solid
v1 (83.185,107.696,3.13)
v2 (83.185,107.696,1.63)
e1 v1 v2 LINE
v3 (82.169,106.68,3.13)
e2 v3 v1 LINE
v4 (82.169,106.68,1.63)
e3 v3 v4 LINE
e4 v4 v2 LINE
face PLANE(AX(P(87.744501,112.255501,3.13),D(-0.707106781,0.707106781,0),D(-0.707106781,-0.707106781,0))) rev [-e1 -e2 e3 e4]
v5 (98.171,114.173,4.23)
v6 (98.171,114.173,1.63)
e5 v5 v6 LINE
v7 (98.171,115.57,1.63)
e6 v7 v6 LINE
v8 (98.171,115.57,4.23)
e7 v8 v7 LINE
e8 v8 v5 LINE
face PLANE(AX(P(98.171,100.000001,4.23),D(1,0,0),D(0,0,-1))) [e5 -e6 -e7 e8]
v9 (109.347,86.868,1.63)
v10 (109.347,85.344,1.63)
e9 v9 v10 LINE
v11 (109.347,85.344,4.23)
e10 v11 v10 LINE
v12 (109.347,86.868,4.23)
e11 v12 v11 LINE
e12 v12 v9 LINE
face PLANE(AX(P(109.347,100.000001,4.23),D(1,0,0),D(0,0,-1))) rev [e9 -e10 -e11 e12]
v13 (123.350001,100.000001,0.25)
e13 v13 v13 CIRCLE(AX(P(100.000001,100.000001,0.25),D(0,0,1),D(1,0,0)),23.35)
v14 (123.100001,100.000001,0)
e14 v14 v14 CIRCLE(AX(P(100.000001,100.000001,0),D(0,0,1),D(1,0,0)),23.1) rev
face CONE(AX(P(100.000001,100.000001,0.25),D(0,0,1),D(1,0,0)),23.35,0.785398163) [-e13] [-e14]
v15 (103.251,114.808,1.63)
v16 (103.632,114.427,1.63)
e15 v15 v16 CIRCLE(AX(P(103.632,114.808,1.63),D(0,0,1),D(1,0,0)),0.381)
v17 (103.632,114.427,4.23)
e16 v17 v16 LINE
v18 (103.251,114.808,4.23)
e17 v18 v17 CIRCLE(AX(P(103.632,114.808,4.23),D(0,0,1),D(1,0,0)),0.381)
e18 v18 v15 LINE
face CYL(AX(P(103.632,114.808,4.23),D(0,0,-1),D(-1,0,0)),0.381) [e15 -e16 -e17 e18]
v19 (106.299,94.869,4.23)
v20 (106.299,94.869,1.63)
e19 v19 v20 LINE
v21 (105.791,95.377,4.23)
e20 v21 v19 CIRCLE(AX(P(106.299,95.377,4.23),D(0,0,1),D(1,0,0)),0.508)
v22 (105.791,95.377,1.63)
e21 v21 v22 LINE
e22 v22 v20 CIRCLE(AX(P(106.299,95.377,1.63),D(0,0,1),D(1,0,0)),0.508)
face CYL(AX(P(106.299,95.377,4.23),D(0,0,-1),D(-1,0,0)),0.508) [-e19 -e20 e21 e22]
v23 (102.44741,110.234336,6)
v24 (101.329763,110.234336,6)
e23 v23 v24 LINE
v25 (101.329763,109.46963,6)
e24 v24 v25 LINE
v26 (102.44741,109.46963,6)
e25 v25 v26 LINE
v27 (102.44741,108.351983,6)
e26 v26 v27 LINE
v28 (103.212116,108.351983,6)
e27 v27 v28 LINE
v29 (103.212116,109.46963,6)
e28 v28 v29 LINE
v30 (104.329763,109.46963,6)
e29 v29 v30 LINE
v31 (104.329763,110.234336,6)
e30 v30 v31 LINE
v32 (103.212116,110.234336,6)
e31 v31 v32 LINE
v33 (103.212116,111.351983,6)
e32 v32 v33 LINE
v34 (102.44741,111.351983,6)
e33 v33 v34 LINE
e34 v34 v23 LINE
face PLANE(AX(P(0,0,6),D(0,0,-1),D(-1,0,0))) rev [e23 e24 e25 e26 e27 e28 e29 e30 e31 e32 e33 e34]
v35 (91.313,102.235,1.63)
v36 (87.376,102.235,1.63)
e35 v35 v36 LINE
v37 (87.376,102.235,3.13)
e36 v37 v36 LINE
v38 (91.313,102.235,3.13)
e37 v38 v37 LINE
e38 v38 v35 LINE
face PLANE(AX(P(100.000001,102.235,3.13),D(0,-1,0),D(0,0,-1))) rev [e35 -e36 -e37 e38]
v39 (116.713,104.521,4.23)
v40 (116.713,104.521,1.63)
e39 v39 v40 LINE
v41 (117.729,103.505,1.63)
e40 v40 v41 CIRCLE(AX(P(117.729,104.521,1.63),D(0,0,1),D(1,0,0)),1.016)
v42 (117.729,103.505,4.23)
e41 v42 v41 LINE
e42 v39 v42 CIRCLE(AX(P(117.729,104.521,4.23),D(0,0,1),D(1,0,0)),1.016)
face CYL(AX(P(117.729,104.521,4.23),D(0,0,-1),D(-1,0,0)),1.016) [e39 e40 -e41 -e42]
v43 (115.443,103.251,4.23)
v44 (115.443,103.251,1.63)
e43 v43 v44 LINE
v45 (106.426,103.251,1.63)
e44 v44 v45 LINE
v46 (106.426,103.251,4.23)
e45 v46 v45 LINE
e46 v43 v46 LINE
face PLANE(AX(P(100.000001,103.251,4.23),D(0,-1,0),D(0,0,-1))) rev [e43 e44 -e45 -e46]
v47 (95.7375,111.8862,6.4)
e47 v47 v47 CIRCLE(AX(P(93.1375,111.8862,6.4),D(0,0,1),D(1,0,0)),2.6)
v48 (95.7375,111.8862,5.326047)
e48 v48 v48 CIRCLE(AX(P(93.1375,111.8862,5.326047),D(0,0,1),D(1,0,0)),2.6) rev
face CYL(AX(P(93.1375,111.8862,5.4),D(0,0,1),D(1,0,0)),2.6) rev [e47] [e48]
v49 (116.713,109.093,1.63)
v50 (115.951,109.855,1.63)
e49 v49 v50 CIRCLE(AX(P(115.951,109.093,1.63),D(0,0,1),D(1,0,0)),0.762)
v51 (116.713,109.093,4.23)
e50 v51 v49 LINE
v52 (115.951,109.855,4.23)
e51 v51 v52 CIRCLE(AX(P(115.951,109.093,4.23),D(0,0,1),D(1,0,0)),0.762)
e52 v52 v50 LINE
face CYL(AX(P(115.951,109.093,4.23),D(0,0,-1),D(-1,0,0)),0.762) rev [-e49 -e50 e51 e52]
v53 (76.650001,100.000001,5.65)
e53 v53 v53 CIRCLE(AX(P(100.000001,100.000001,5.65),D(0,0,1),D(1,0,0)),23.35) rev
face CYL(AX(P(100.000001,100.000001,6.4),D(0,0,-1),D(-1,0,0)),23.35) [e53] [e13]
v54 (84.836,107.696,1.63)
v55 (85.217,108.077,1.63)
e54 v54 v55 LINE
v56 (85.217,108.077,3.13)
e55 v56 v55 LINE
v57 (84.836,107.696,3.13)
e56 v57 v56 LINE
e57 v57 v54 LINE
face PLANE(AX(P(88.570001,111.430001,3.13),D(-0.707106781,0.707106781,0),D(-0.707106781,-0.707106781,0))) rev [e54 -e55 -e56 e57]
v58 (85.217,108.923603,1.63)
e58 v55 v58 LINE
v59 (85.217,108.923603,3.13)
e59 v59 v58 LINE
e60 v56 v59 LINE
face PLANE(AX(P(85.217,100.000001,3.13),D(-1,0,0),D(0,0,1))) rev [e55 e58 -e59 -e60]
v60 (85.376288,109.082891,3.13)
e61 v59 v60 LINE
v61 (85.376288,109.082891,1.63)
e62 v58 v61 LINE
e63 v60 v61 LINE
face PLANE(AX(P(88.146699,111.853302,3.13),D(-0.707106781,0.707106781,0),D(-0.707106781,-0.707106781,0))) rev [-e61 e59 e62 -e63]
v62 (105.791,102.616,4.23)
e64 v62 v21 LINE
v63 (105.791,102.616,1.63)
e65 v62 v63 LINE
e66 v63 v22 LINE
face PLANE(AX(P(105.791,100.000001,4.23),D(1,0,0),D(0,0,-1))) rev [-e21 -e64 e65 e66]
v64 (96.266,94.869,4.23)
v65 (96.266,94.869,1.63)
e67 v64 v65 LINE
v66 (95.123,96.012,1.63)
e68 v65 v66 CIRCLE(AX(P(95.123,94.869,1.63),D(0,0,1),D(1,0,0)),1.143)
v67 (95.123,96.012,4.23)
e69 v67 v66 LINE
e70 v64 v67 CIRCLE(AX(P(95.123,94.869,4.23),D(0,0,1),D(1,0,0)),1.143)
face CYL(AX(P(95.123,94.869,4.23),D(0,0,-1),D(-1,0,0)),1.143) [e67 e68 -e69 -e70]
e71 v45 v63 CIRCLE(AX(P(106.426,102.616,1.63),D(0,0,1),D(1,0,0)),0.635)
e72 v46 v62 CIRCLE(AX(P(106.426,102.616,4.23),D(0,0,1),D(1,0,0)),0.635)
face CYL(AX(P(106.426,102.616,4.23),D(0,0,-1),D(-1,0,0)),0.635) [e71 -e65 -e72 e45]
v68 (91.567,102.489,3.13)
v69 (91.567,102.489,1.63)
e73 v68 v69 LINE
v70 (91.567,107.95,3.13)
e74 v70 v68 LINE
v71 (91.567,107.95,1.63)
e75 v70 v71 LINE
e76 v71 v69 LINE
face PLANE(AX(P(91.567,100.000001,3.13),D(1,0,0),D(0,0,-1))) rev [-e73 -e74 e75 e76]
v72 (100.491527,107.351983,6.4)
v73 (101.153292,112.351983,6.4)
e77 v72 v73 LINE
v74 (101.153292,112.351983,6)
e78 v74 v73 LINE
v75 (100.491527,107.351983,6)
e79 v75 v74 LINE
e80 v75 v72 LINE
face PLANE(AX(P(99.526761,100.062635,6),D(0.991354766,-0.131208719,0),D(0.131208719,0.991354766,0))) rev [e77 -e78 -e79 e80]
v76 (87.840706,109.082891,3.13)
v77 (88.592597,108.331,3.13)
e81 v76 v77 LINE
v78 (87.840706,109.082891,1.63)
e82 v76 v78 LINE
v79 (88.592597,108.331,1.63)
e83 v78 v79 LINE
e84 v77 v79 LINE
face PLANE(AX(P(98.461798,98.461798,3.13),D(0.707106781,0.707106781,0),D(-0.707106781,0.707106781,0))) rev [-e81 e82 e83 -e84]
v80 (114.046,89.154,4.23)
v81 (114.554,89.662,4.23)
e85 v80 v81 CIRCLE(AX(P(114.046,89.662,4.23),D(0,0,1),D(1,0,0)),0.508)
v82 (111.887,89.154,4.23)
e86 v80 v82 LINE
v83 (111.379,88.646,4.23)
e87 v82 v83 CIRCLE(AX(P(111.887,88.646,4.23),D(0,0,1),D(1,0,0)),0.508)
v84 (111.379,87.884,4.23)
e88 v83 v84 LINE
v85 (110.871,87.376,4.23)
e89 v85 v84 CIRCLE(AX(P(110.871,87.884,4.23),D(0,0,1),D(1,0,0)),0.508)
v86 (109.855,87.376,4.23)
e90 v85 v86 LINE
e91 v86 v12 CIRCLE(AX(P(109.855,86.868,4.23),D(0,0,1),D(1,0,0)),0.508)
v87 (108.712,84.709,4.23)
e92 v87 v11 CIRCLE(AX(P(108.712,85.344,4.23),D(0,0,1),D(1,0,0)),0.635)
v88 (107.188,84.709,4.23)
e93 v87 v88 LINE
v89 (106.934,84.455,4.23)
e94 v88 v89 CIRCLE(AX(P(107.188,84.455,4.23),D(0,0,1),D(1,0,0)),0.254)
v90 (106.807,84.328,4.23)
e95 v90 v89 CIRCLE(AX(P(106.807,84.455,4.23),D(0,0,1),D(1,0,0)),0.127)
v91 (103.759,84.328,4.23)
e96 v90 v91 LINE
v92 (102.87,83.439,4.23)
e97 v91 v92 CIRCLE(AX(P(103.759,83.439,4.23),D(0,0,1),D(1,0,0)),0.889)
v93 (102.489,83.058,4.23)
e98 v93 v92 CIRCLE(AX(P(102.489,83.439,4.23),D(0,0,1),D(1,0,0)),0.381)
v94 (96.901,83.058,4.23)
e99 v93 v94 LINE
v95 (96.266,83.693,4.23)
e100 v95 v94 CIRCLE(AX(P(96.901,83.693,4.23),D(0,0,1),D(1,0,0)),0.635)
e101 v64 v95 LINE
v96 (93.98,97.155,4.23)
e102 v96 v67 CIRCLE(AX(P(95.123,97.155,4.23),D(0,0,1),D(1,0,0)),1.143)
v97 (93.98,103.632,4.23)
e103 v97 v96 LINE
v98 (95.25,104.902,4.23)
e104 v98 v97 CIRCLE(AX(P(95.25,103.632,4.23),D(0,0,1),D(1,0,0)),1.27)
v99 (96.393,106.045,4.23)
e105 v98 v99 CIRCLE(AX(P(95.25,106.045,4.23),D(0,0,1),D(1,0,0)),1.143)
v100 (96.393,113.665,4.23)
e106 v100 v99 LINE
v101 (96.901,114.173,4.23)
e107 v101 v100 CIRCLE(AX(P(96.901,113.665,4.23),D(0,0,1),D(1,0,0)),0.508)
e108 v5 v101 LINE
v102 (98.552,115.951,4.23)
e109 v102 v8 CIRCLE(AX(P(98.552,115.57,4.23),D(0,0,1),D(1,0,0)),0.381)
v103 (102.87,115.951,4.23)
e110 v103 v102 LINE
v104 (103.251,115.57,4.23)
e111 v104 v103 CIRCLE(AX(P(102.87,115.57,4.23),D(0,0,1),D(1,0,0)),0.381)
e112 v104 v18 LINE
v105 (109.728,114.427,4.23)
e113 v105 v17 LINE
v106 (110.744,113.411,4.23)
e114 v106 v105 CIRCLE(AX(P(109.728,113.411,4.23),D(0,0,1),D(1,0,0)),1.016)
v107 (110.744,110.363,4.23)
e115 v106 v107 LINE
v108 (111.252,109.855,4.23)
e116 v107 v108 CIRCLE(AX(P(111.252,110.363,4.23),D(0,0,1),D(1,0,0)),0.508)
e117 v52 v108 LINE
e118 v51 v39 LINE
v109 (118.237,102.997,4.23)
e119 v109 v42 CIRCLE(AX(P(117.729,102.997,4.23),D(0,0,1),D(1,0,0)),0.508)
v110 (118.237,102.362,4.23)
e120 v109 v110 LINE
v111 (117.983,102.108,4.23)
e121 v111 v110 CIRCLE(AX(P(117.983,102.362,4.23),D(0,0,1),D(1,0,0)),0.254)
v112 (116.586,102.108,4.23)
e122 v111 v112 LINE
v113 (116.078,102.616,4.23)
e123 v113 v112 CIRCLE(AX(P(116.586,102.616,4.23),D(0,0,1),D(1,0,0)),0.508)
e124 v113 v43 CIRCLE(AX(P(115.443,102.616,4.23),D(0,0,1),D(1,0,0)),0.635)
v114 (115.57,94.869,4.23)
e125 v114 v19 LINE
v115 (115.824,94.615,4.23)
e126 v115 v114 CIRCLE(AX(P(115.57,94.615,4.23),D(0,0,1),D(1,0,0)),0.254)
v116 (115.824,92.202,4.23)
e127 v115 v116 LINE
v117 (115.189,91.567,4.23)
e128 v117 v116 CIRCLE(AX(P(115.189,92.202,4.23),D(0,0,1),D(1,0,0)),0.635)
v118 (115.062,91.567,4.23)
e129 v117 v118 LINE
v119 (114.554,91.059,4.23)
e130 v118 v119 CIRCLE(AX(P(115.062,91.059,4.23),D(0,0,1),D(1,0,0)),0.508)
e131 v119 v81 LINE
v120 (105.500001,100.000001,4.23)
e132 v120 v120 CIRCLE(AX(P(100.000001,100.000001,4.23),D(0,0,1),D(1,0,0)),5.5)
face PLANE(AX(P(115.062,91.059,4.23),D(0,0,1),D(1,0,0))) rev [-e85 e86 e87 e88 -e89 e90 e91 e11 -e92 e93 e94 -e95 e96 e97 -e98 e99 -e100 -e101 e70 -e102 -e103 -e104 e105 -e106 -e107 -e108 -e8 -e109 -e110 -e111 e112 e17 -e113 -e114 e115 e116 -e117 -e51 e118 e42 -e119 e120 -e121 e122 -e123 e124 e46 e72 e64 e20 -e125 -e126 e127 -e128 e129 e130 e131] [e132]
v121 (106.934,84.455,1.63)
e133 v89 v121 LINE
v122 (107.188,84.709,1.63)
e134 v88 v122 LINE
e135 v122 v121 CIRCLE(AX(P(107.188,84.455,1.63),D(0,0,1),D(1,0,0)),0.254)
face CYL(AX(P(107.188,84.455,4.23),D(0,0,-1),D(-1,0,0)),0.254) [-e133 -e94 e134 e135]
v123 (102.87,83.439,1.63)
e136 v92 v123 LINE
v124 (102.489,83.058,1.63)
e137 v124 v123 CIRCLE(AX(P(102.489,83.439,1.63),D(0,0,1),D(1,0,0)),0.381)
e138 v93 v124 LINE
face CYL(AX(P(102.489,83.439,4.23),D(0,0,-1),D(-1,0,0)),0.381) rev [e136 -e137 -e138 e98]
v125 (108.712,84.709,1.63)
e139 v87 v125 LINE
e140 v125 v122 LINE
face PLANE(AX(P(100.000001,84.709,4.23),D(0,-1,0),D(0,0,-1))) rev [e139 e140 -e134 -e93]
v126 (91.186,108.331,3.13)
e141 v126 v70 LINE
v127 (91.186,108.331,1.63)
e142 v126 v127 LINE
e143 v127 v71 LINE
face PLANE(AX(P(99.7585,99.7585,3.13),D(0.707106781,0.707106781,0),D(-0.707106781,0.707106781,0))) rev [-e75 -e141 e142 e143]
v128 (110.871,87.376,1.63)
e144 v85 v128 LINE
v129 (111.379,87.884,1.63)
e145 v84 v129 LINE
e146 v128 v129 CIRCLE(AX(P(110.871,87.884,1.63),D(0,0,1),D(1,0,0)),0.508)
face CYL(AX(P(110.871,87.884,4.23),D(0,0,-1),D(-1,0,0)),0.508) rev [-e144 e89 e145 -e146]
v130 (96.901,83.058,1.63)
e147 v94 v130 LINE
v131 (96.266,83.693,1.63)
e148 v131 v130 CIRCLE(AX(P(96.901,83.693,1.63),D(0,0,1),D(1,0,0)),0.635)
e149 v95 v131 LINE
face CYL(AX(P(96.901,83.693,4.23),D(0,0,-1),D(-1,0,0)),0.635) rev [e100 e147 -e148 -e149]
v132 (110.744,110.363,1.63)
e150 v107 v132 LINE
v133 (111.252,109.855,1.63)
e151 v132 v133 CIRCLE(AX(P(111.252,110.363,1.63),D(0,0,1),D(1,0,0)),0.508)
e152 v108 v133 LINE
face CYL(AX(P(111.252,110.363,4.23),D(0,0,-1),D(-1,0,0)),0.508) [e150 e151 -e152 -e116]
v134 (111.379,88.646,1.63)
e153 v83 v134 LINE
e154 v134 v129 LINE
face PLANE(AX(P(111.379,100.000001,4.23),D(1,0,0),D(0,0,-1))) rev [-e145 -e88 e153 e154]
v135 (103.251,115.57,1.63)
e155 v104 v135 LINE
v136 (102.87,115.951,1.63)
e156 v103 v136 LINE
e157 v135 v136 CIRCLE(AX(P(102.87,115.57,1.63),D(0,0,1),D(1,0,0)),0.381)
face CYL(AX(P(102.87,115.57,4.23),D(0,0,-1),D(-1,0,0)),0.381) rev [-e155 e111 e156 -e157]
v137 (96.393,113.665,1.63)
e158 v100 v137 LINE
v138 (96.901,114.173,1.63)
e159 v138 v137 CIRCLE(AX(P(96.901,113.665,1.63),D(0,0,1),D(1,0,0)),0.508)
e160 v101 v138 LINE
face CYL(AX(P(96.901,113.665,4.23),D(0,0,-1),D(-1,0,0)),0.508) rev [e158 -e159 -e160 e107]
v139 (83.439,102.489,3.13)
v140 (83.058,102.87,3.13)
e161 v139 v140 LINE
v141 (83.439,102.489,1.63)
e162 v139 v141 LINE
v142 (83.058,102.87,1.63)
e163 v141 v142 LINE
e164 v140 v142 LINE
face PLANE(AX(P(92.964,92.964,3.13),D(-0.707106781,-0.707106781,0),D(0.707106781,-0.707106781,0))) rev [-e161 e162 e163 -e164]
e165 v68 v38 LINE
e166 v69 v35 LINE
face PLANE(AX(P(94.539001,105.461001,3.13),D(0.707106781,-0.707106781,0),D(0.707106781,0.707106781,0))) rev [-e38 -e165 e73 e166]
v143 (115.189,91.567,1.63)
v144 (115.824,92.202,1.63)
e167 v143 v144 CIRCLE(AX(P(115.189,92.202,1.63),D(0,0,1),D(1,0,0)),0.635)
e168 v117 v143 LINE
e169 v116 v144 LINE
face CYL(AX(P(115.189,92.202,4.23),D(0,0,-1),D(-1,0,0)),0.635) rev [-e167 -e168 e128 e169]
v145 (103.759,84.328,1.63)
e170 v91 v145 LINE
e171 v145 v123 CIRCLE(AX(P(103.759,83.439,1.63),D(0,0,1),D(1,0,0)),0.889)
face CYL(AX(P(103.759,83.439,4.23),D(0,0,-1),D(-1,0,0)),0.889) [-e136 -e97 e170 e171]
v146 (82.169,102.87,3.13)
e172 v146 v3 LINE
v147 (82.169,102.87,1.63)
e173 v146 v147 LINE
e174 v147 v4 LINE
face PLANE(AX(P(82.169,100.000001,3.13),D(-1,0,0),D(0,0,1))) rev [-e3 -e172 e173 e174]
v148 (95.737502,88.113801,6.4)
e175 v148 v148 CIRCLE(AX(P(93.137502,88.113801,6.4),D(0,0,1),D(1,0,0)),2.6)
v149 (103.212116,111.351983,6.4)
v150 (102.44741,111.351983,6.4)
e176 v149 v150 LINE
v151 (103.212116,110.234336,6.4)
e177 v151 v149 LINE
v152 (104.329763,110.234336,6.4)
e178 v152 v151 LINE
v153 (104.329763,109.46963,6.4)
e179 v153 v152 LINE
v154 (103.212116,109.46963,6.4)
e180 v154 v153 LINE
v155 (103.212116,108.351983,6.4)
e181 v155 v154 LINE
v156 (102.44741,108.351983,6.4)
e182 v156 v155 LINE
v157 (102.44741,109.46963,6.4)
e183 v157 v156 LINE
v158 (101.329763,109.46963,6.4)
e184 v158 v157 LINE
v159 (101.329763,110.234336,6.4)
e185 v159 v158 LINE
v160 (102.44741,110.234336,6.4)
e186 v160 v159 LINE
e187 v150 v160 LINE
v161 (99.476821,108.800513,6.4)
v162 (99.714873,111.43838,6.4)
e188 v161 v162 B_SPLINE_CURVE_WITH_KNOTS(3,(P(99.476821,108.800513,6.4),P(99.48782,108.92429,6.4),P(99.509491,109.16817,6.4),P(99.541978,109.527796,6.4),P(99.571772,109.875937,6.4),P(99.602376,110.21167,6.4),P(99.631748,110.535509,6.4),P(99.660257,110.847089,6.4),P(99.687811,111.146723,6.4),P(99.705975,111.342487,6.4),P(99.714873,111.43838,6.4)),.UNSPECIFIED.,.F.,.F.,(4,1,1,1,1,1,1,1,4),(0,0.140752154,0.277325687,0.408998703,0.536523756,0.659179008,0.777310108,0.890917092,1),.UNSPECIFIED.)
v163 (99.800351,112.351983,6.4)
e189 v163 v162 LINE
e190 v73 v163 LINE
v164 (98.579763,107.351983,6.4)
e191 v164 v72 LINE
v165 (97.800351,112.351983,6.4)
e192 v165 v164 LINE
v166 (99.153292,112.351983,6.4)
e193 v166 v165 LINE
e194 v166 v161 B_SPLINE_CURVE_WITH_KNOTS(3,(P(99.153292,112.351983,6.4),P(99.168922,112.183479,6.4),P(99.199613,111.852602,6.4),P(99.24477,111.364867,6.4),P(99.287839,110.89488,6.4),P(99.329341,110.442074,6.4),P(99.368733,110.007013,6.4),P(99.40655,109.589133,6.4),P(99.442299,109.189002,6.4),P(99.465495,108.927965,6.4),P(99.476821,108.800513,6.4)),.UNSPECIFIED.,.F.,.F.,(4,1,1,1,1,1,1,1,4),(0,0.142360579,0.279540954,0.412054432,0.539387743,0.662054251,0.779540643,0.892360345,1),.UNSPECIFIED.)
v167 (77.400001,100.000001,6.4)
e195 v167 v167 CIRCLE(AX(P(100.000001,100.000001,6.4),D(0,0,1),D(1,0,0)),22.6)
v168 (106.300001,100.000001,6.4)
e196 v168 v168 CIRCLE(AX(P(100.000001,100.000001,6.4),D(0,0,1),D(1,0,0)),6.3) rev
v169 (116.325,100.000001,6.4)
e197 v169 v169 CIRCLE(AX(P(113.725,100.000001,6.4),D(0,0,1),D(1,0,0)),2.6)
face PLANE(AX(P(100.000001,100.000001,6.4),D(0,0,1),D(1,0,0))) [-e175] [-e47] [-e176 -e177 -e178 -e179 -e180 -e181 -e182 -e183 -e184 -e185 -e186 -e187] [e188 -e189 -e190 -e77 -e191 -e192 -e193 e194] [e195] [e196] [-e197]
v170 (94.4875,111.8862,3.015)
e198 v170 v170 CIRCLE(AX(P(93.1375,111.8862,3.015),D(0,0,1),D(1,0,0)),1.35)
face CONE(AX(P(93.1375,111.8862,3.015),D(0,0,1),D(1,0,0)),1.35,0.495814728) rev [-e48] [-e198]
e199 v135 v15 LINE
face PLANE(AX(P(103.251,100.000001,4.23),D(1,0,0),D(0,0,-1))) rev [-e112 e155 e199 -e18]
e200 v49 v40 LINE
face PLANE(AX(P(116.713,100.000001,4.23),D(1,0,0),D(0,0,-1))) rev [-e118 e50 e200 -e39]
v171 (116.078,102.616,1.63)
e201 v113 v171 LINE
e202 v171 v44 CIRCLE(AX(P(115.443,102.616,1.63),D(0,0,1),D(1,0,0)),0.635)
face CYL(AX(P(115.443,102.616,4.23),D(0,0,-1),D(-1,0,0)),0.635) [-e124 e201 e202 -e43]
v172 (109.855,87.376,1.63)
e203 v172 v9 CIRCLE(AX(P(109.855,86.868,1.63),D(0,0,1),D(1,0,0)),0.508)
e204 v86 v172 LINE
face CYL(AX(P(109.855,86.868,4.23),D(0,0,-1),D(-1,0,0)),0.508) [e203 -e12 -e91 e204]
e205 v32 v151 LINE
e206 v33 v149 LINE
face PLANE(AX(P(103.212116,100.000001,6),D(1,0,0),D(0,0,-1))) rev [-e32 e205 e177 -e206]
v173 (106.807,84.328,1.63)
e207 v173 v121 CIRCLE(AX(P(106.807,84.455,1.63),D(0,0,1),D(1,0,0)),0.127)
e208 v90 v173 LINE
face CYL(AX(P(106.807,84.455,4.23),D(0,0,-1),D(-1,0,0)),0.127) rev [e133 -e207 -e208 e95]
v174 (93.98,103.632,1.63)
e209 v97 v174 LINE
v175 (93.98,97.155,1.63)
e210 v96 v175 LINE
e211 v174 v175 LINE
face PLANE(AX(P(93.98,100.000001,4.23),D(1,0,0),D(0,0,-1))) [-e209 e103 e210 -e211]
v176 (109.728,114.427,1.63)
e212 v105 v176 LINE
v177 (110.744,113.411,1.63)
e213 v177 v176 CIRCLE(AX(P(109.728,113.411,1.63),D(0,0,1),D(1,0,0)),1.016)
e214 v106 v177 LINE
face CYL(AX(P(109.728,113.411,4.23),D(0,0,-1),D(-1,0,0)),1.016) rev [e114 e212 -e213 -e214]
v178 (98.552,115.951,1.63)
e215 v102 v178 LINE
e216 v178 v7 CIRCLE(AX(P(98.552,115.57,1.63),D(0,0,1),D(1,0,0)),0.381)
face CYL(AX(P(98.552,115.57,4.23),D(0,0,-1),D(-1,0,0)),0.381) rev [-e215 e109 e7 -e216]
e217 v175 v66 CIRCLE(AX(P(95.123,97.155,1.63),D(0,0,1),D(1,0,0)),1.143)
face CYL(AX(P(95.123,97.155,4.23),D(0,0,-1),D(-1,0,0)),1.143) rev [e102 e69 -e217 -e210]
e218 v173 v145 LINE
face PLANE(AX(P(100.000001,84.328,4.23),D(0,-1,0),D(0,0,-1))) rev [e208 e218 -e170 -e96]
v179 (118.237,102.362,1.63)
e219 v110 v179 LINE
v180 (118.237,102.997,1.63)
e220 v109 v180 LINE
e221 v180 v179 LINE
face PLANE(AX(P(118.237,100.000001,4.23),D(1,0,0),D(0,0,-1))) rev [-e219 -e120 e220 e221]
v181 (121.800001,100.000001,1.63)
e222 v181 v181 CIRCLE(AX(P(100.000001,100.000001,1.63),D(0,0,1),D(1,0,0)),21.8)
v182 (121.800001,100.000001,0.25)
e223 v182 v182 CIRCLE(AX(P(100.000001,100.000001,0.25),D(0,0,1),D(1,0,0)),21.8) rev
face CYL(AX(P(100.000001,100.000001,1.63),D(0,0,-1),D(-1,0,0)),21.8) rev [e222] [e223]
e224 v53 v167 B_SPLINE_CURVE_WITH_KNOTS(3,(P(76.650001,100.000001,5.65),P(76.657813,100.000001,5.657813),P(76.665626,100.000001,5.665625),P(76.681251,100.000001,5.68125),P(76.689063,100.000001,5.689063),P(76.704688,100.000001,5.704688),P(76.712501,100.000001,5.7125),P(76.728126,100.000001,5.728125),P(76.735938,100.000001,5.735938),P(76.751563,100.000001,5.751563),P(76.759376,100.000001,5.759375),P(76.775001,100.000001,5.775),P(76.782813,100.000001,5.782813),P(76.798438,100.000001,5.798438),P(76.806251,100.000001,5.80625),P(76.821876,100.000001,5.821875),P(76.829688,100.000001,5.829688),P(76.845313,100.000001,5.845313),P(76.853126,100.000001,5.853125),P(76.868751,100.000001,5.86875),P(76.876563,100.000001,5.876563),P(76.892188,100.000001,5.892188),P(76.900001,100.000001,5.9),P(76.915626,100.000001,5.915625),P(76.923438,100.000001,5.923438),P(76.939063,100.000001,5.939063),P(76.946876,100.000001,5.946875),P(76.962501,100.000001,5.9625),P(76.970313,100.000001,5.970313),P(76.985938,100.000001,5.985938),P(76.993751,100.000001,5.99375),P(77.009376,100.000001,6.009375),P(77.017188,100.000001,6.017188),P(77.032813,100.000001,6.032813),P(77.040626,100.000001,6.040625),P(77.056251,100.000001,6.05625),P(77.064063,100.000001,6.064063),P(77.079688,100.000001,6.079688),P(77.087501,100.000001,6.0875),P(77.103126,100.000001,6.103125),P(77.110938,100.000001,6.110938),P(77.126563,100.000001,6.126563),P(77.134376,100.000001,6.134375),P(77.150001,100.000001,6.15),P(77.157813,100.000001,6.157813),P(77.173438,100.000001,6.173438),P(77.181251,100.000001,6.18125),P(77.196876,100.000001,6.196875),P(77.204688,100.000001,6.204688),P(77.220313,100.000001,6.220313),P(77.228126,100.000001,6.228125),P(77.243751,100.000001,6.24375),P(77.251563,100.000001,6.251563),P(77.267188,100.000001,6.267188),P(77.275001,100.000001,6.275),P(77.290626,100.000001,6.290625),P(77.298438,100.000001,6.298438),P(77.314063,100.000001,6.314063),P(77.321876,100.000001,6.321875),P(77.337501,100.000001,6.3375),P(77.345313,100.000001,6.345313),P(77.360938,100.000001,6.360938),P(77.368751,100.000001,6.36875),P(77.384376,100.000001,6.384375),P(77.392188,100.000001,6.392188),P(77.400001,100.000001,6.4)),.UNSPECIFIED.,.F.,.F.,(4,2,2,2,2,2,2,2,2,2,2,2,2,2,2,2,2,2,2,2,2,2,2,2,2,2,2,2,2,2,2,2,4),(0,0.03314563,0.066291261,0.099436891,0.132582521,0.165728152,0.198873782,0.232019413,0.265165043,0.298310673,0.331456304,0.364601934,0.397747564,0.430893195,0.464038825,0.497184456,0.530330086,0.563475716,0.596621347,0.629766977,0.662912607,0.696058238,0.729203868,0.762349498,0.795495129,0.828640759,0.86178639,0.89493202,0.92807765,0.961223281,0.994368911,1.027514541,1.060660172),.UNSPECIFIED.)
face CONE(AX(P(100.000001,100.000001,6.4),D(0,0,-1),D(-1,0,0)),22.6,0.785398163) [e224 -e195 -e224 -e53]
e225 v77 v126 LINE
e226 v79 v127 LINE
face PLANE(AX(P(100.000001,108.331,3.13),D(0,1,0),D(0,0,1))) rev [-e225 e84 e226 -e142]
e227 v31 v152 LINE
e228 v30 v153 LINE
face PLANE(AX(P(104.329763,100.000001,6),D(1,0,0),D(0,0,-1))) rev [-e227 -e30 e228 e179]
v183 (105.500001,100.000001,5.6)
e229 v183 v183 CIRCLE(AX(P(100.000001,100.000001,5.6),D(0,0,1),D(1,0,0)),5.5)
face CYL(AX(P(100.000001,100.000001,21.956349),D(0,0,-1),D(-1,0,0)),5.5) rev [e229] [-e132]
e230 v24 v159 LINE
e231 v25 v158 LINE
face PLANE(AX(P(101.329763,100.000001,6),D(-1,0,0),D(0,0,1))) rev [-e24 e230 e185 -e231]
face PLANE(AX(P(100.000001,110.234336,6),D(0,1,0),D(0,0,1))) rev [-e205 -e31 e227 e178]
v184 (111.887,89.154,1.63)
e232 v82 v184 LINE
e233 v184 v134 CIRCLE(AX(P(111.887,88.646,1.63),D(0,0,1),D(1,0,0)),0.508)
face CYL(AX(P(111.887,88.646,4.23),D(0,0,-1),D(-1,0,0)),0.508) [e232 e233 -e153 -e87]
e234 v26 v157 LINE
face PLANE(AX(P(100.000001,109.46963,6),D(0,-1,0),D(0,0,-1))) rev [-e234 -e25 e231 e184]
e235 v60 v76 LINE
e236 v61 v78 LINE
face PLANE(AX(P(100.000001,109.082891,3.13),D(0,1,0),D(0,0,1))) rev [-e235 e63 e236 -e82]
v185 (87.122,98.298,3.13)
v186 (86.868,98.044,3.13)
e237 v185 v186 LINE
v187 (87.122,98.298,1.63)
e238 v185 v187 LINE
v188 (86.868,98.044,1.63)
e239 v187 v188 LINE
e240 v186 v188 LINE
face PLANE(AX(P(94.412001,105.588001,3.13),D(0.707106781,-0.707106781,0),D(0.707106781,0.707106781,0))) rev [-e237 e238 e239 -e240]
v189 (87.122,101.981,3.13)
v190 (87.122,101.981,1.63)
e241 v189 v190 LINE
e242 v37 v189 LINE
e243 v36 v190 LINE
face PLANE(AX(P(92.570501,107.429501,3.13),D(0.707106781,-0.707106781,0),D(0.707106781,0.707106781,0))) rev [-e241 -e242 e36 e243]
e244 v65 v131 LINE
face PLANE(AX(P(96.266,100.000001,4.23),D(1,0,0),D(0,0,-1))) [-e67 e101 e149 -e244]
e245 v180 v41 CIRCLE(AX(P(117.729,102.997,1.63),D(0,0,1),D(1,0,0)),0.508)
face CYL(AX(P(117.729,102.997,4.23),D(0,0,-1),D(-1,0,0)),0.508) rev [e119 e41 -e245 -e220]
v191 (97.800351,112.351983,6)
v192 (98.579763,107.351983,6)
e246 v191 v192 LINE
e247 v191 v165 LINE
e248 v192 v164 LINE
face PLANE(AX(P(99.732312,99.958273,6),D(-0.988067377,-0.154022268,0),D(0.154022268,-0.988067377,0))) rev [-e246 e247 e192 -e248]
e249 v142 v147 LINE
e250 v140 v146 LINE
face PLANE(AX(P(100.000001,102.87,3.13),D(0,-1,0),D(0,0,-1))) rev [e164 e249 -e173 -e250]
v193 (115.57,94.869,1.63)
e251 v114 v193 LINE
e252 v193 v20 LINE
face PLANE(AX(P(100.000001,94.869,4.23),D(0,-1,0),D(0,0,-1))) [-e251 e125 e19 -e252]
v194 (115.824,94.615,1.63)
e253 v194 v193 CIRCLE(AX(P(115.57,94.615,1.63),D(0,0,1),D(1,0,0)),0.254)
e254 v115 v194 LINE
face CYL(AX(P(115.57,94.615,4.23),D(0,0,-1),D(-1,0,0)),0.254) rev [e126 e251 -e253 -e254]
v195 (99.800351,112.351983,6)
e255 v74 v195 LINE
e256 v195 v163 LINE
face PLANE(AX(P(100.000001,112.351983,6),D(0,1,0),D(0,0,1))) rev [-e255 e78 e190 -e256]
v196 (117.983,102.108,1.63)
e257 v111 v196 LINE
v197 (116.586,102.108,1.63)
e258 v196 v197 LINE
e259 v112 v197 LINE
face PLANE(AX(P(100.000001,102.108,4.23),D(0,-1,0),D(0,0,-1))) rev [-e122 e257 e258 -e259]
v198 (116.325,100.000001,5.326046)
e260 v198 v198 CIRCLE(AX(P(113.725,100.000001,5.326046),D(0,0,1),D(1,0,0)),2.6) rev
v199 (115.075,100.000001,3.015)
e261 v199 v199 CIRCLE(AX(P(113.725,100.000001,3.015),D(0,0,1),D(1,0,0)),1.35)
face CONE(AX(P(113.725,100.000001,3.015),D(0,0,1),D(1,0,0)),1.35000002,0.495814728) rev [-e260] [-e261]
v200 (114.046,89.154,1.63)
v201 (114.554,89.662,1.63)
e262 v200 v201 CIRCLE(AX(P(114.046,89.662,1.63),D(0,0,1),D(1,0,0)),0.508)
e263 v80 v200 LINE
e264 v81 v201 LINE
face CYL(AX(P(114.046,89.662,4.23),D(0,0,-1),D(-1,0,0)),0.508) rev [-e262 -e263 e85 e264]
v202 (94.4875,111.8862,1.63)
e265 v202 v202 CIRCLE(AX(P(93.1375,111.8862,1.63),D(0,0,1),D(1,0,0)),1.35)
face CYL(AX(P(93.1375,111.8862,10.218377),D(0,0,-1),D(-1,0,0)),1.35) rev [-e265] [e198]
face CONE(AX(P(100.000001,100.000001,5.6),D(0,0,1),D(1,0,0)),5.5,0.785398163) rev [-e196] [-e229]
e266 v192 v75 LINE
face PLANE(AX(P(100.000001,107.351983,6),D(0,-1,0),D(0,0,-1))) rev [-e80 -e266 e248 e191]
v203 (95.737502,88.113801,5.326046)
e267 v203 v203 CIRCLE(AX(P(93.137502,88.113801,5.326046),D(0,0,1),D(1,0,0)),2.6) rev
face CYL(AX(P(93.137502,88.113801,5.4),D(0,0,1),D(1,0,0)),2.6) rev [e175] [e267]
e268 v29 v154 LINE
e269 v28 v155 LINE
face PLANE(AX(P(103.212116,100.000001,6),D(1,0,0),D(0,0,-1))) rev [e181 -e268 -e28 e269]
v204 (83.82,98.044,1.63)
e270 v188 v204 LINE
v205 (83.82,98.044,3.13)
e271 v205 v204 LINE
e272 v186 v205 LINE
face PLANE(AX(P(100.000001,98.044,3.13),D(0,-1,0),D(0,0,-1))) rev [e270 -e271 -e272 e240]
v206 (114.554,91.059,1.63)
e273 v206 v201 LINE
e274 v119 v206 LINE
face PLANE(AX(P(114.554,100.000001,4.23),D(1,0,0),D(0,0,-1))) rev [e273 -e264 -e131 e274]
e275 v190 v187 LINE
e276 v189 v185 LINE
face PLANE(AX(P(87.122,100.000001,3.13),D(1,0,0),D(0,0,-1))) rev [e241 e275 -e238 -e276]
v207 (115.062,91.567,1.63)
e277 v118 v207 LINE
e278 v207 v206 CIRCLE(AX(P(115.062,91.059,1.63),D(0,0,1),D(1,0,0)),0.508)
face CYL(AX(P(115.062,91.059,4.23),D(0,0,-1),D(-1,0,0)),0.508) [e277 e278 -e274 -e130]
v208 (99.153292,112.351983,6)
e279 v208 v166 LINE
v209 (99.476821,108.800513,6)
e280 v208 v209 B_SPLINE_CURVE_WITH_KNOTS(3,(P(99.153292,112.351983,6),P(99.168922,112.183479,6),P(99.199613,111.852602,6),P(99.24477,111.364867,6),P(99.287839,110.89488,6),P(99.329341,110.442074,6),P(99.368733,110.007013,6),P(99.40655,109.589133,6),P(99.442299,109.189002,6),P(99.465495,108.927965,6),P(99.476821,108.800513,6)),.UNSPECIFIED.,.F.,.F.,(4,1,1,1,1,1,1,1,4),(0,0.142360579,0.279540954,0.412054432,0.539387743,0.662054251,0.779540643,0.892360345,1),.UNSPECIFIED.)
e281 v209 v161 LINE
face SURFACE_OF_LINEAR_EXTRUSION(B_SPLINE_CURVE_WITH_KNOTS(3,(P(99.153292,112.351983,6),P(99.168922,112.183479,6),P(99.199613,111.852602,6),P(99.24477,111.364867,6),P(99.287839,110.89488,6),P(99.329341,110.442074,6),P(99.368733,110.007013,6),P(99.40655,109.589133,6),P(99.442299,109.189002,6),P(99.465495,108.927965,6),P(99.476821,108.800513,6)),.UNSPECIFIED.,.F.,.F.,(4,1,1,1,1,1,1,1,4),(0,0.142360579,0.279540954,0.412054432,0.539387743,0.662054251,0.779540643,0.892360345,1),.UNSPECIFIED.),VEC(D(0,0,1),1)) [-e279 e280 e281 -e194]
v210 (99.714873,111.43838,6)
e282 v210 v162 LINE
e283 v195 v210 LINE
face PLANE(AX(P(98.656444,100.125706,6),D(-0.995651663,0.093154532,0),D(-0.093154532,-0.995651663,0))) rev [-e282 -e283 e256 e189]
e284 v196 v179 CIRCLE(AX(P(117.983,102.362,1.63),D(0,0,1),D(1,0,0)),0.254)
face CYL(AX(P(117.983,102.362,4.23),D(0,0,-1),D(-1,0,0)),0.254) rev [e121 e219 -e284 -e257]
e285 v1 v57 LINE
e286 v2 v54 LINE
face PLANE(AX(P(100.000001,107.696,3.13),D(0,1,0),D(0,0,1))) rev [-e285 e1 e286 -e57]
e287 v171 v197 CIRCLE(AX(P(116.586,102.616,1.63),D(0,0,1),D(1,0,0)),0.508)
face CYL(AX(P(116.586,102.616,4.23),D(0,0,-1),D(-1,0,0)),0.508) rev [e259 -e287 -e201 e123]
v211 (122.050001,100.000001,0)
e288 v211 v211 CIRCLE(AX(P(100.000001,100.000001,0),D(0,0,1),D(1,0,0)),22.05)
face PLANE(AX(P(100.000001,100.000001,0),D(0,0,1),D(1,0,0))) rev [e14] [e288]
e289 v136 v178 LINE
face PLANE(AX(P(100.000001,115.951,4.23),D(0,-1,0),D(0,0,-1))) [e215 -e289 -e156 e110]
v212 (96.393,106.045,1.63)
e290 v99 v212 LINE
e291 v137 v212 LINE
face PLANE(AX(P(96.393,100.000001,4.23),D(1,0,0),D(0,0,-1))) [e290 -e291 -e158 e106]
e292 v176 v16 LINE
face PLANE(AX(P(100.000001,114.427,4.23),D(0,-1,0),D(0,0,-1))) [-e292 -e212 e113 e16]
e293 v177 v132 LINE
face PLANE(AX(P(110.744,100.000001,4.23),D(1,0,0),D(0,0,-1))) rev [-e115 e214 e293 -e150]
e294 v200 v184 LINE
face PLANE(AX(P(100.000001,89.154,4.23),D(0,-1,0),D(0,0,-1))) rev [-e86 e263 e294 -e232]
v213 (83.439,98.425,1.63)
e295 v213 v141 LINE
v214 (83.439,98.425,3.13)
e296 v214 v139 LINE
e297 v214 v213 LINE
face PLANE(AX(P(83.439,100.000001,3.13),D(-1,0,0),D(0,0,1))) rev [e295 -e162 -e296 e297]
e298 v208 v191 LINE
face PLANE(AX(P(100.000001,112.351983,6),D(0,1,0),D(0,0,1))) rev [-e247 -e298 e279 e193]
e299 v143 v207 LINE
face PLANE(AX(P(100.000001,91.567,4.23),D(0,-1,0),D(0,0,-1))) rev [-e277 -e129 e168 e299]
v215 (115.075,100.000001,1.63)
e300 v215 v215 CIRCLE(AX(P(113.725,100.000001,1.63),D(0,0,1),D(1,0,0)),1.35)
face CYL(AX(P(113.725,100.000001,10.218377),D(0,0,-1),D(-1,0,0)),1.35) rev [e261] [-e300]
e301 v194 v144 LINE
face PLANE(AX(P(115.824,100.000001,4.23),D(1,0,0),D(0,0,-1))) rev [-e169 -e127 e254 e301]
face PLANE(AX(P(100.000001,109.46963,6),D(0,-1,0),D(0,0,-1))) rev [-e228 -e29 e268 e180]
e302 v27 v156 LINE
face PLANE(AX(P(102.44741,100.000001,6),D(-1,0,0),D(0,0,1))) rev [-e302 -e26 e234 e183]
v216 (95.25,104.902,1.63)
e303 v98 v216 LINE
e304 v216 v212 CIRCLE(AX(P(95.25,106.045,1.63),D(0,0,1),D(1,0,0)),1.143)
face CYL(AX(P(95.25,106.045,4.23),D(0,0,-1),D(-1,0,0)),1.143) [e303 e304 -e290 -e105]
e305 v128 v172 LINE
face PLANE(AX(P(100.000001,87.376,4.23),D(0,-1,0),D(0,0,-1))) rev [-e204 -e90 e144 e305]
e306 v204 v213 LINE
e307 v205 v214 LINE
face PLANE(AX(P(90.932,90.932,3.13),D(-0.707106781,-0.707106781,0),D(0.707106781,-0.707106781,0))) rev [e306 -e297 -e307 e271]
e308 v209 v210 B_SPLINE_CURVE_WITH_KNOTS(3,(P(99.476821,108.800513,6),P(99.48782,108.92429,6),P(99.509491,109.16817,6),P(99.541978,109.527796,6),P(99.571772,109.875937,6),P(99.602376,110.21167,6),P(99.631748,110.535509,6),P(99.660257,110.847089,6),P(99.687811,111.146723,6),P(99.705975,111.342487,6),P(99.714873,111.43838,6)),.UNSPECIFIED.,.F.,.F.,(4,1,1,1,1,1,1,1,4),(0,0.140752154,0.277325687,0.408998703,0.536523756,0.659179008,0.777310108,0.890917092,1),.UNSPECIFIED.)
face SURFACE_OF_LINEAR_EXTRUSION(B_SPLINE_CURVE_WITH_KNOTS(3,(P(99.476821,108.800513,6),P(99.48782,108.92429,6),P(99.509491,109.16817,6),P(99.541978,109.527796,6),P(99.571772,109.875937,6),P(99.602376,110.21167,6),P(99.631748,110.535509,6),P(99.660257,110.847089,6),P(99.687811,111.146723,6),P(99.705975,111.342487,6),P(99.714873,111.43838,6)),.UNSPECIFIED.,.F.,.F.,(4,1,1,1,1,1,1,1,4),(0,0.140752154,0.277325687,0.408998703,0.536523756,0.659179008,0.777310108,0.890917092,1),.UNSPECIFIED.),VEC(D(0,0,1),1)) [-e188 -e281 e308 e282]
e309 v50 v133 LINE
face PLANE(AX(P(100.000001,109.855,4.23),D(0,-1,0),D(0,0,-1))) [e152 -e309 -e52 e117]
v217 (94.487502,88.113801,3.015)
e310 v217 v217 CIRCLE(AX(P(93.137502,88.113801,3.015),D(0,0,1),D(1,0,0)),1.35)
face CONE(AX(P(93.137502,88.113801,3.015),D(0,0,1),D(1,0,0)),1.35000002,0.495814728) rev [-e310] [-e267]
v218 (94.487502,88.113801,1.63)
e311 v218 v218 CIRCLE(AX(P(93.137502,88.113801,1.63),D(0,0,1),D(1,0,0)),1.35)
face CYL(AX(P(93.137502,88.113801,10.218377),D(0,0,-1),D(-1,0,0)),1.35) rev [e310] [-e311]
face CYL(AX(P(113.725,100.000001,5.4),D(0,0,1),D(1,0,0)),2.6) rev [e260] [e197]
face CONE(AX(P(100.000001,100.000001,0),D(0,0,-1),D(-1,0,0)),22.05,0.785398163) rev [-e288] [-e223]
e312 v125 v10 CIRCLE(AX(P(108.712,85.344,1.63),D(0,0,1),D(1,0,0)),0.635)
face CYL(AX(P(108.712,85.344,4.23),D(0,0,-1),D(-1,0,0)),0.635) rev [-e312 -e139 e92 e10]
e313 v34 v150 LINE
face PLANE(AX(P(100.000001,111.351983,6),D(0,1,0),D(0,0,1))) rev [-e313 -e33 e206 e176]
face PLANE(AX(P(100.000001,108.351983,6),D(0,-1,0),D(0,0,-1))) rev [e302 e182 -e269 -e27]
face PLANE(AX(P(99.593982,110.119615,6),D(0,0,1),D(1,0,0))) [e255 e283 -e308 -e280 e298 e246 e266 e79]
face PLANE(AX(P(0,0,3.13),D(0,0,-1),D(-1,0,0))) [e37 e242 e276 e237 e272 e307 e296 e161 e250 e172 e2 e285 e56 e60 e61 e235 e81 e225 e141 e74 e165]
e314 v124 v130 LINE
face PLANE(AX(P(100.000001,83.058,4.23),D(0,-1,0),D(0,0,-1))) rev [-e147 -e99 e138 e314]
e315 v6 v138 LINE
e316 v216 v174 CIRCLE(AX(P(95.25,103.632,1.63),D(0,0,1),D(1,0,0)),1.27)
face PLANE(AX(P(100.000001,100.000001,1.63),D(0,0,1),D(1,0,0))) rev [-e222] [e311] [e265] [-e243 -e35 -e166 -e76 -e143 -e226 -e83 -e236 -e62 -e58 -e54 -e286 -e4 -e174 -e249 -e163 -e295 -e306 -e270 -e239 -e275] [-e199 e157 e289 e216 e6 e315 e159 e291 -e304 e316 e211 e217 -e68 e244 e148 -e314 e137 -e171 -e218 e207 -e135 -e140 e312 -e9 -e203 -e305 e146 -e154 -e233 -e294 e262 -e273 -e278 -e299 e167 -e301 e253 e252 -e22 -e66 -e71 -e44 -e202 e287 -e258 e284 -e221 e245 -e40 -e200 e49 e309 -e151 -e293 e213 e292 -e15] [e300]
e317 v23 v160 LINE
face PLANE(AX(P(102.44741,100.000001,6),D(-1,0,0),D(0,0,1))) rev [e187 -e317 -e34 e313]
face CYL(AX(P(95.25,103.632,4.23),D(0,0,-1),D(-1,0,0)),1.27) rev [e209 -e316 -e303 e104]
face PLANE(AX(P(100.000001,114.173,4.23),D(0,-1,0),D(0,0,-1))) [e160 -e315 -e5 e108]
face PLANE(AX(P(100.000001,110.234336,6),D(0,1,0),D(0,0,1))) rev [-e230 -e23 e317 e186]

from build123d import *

# Parameters (mm, degrees)
SKETCH_3_R          = 23.35
EXTRUDE_3_DEPTH     = 6.4
SKETCH_2_R          = 21.8
CUT_EXTRUDE_1_DEPTH = 1.63
CUT_EXTRUDE_START   = 1.63
CUT_EXTRUDE_2_DEPTH = 2.6
SKETCH_5_R          = 1.35000002
SKETCH_5_R_2        = 1.35
CUT_EXTRUDE_3_DEPTH = 4.77
CUT_EXTRUDE_START_2 = 4.23
SKETCH_5_3_R        = 5.5
CUT_EXTRUDE_4_DEPTH = 2.17
CHAMFER_1_SIZE      = 0.75
CUT_EXTRUDE_START_3 = 6.4
SKETCH_6_R          = 2.6
CUT_EXTRUDE_5_DEPTH = 1
CHAMFER_2_SIZE      = 1.29
CHAMFER_2_SIZE_2    = 2.385
CHAMFER_3_SIZE      = 0.25
CHAMFER_4_SIZE      = 0.8
CUT_EXTRUDE_7_DEPTH = 0.4
CUT_EXTRUDE_8_DEPTH = 1.5


with BuildPart() as part:
    # 草图3 → 凸台-拉伸3 (new body)
    with BuildSketch(Plane.XY):
        with Locations((100.00000066, 100.00000066)):
            Circle(SKETCH_3_R)
    extrude(amount=EXTRUDE_3_DEPTH)

    # 草图2 → 切除-拉伸1 (cut)
    with BuildSketch(Plane.XY):
        with Locations((100.00000066, 100.00000066)):
            Circle(SKETCH_2_R)
    extrude(amount=CUT_EXTRUDE_1_DEPTH, mode=Mode.SUBTRACT)

    # 草图4 → 切除-拉伸2 (cut)
    with BuildSketch(Plane.XY.offset(CUT_EXTRUDE_START)):
        with BuildLine():
            Line((98.171, 114.173), (98.171, 115.57))
            ThreePointArc((98.171, 115.57), (98.282592316, 115.839407684), (98.552, 115.951))
            Line((98.552, 115.951), (102.87, 115.951))
            ThreePointArc((102.87, 115.951), (103.139407684, 115.839407684), (103.251, 115.57))
            Line((103.251, 115.57), (103.251, 114.808))
            ThreePointArc((103.251, 114.808), (103.362592316, 114.538592316), (103.632, 114.427))
            Line((103.632, 114.427), (109.728, 114.427))
            ThreePointArc((109.728, 114.427), (110.44642049, 114.12942049), (110.744, 113.411))
            Line((110.744, 113.411), (110.744, 110.363))
            ThreePointArc((110.744, 110.363), (110.892789755, 110.003789755), (111.252, 109.855))
            Line((111.252, 109.855), (115.951, 109.855))
            ThreePointArc((115.951, 109.855), (116.489815367, 109.631815367), (116.713, 109.093))
            Line((116.713, 109.093), (116.713, 104.521))
            ThreePointArc((116.713, 104.521), (117.01057951, 103.80257951), (117.729, 103.505))
            ThreePointArc((117.729, 103.505), (118.088210245, 103.356210245), (118.237, 102.997))
            Line((118.237, 102.997), (118.237, 102.362))
            ThreePointArc((118.237, 102.362), (118.162605122, 102.182394878), (117.983, 102.108))
            Line((117.983, 102.108), (116.586, 102.108))
            ThreePointArc((116.586, 102.108), (116.226789755, 102.256789755), (116.078, 102.616))
            ThreePointArc((116.078, 102.616), (115.892012806, 103.065012806), (115.443, 103.251))
            Line((115.443, 103.251), (106.426, 103.251))
            ThreePointArc((106.426, 103.251), (105.976987194, 103.065012806), (105.791, 102.616))
            Line((105.791, 102.616), (105.791, 95.377))
            ThreePointArc((105.791, 95.377), (105.939789755, 95.017789755), (106.299, 94.869))
            Line((106.299, 94.869), (115.57, 94.869))
            ThreePointArc((115.57, 94.869), (115.749605122, 94.794605122), (115.824, 94.615))
            Line((115.824, 94.615), (115.824, 92.202))
            ThreePointArc((115.824, 92.202), (115.638012806, 91.752987194), (115.189, 91.567))
            Line((115.189, 91.567), (115.062, 91.567))
            ThreePointArc((115.062, 91.567), (114.702789755, 91.418210245), (114.554, 91.059))
            Line((114.554, 91.059), (114.554, 89.662))
            ThreePointArc((114.554, 89.662), (114.405210245, 89.302789755), (114.046, 89.154))
            Line((114.046, 89.154), (111.887, 89.154))
            ThreePointArc((111.887, 89.154), (111.527789755, 89.005210245), (111.379, 88.646))
            Line((111.379, 88.646), (111.379, 87.884))
            ThreePointArc((111.379, 87.884), (111.230210245, 87.524789755), (110.871, 87.376))
            Line((110.871, 87.376), (109.855, 87.376))
            ThreePointArc((109.855, 87.376), (109.495789755, 87.227210245), (109.347, 86.868))
            Line((109.347, 86.868), (109.347, 85.344))
            ThreePointArc((109.347, 85.344), (109.161012806, 84.894987194), (108.712, 84.709))
            Line((108.712, 84.709), (107.188, 84.709))
            ThreePointArc((107.188, 84.709), (107.008394878, 84.634605122), (106.934, 84.455))
            ThreePointArc((106.934, 84.455), (106.896802561, 84.365197439), (106.807, 84.328))
            Line((106.807, 84.328), (103.759, 84.328))
            ThreePointArc((103.759, 84.328), (103.130382072, 84.067617928), (102.87, 83.439))
            ThreePointArc((102.87, 83.439), (102.758407684, 83.169592316), (102.489, 83.058))
            Line((102.489, 83.058), (96.901, 83.058))
            ThreePointArc((96.901, 83.058), (96.451987194, 83.243987194), (96.266, 83.693))
            Line((96.266, 83.693), (96.266, 94.869))
            ThreePointArc((96.266, 94.869), (95.931223051, 95.677223051), (95.123, 96.012))
            ThreePointArc((95.123, 96.012), (94.314776949, 96.346776949), (93.98, 97.155))
            Line((93.98, 97.155), (93.98, 103.632))
            ThreePointArc((93.98, 103.632), (94.351974388, 104.530025612), (95.25, 104.902))
            ThreePointArc((95.25, 104.902), (96.058223051, 105.236776949), (96.393, 106.045))
            Line((96.393, 106.045), (96.393, 113.665))
            ThreePointArc((96.393, 113.665), (96.541789755, 114.024210245), (96.901, 114.173))
            Line((96.901, 114.173), (98.171, 114.173))
        make_face()
    extrude(amount=CUT_EXTRUDE_2_DEPTH, mode=Mode.SUBTRACT)

    # 草图5 → 切除-拉伸3 (cut)
    with BuildSketch(Plane.XY.offset(CUT_EXTRUDE_START)):
        with Locations((113.72499988, 100.00000066)):
            Circle(SKETCH_5_R)
        with Locations((93.13749978, 111.8861999)):
            Circle(SKETCH_5_R_2)
        with Locations((93.13750232, 88.11380142)):
            Circle(SKETCH_5_R)
    extrude(amount=CUT_EXTRUDE_3_DEPTH, mode=Mode.SUBTRACT)

    # 草图5<3> → 切除-拉伸4 (cut)
    with BuildSketch(Plane.XY.offset(CUT_EXTRUDE_START_2)):
        with Locations((100.00000066, 100.00000066)):
            Circle(SKETCH_5_3_R)
    extrude(amount=CUT_EXTRUDE_4_DEPTH, mode=Mode.SUBTRACT)

    # 倒角1
    chamfer_1_edges = [part.edges().sort_by_distance(p)[0] for p in [
        (76.65000066, 100.00000066, 6.4),
    ]]
    chamfer(chamfer_1_edges, length=CHAMFER_1_SIZE)

    # 草图6 → 切除-拉伸5 (cut)
    with BuildSketch(Plane.XY.offset(CUT_EXTRUDE_START_3)):
        with Locations((93.13749978, 111.8861999)):
            Circle(SKETCH_6_R)
        with Locations((93.13750232, 88.11380142)):
            Circle(SKETCH_6_R)
        with Locations((113.72499988, 100.00000066)):
            Circle(SKETCH_6_R)
    extrude(amount=-CUT_EXTRUDE_5_DEPTH, mode=Mode.SUBTRACT)

    # 倒角2
    # the kernel refuses this chamfer: 2.385, 1.29 mm, written as the material it takes off along each edge
    with BuildSketch(Plane(origin=(113.72499988, 100.00000066, 5.4), x_dir=(1, 0, 0), z_dir=(0, 1, 0))) as chamfer_2_piece_1_section:
        Polygon((1.35000002 + CHAMFER_2_SIZE, 0), (1.35000002, CHAMFER_2_SIZE_2), (1.35000002, 0), align=None)
    chamfer_2_piece_1 = revolve(axis=Axis((113.72499988, 100.00000066, 5.4), (0, 0, -1)), mode=Mode.PRIVATE)
    chamfer_2_piece_1 = chamfer_2_piece_1 & Plane(origin=(113.72499988, 100.00000066, 4.141318071), x_dir=(1, 0, 0), z_dir=(0, 0, 1)) * Cylinder(2.6, 11, mode=Mode.PRIVATE)
    add(chamfer_2_piece_1, mode=Mode.SUBTRACT)
    with BuildSketch(Plane(origin=(93.13750232, 88.11380142, 5.4), x_dir=(1, 0, 0), z_dir=(0, 1, 0))) as chamfer_2_piece_2_section:
        Polygon((1.35000002 + CHAMFER_2_SIZE, 0), (1.35000002, CHAMFER_2_SIZE_2), (1.35000002, 0), align=None)
    chamfer_2_piece_2 = revolve(axis=Axis((93.13750232, 88.11380142, 5.4), (0, 0, -1)), mode=Mode.PRIVATE)
    chamfer_2_piece_2 = chamfer_2_piece_2 & Plane(origin=(93.13750232, 88.11380142, 4.141318071), x_dir=(1, 0, 0), z_dir=(0, 0, 1)) * Cylinder(2.6, 11, mode=Mode.PRIVATE)
    add(chamfer_2_piece_2, mode=Mode.SUBTRACT)
    with BuildSketch(Plane(origin=(93.13749978, 111.8861999, 5.4), x_dir=(1, 0, 0), z_dir=(0, 1, 0))) as chamfer_2_piece_3_section:
        Polygon((1.35 + CHAMFER_2_SIZE, 0), (1.35, CHAMFER_2_SIZE_2), (1.35, 0), align=None)
    chamfer_2_piece_3 = revolve(axis=Axis((93.13749978, 111.8861999, 5.4), (0, 0, -1)), mode=Mode.PRIVATE)
    chamfer_2_piece_3 = chamfer_2_piece_3 & Plane(origin=(93.13749978, 111.8861999, 4.14131809), x_dir=(1, 0, 0), z_dir=(0, 0, 1)) * Cylinder(2.6, 11, mode=Mode.PRIVATE)
    add(chamfer_2_piece_3, mode=Mode.SUBTRACT)

    # 倒角3
    chamfer_3_edges = [part.edges().sort_by_distance(p)[0] for p in [
        (76.65000066, 100.00000066, 0),
        (78.20000066, 100.00000066, 0),
    ]]
    chamfer(chamfer_3_edges, length=CHAMFER_3_SIZE)

    # 倒角4
    chamfer_4_edges = [part.edges().sort_by_distance(p)[0] for p in [
        (94.50000066, 100.00000066, 6.4),
    ]]
    chamfer(chamfer_4_edges, length=CHAMFER_4_SIZE)

    # 草图7 → 切除-拉伸7 (cut)
    with BuildSketch(Plane.XY.offset(CUT_EXTRUDE_START_3)):
        with BuildLine():
            Line((101.153292027, 112.351983356), (100.491527321, 107.351983356))
            Line((100.491527321, 107.351983356), (98.579762615, 107.351983356))
            Line((98.579762615, 107.351983356), (97.800350851, 112.351983356))
            Line((97.800350851, 112.351983356), (99.153292027, 112.351983356))
            add(Edge.make_bspline(
                [(99.153292027, 112.351983356), (99.168921879, 112.183478907), (99.199612846, 111.852601535), (99.244769811, 111.364867467), (99.287839178, 110.894880063), (99.32934088, 110.442074285), (99.36873281, 110.007013377), (99.406549784, 109.589133158), (99.442298553, 109.189001817), (99.465495493, 108.927964622), (99.476821439, 108.800512768)],
                knots=[0, 0, 0, 0, 1.138884633, 2.23632763, 3.296435453, 4.315101947, 5.296434007, 6.236325144, 7.138882761, 8, 8, 8, 8], degree=3))
            add(Edge.make_bspline(
                [(99.476821439, 108.800512768), (99.487820182, 108.924289993), (99.50949114, 109.168169772), (99.54197814, 109.527795956), (99.57177187, 109.875936959), (99.602376256, 110.211670122), (99.631747985, 110.535509401), (99.660256803, 110.847088908), (99.687810927, 111.146723094), (99.705975255, 111.342486994), (99.714872909, 111.438380415)],
                knots=[0, 0, 0, 0, 1.126017228, 2.218605494, 3.271989625, 4.292190047, 5.273432066, 6.218480867, 7.127336737, 8, 8, 8, 8], degree=3))
            Line((99.714872909, 111.438380415), (99.800350851, 112.351983356))
            Line((99.800350851, 112.351983356), (101.153292027, 112.351983356))
        make_face()
        Polygon((101.329762615, 110.234336298), (102.447409674, 110.234336298), (102.447409674, 111.351983356), (103.212115556, 111.351983356), (103.212115556, 110.234336298), (104.329762615, 110.234336298), (104.329762615, 109.469630415), (103.212115556, 109.469630415), (103.212115556, 108.351983356), (102.447409674, 108.351983356), (102.447409674, 109.469630415), (101.329762615, 109.469630415), align=None)
    extrude(amount=-CUT_EXTRUDE_7_DEPTH, mode=Mode.SUBTRACT)

    # 草图8 → 切除-拉伸8 (cut)
    with BuildSketch(Plane.XY.offset(CUT_EXTRUDE_START)):
        Polygon((82.169, 102.87), (83.058, 102.87), (83.439, 102.489), (83.439, 98.425), (83.82, 98.044), (86.868, 98.044), (87.122, 98.298), (87.122, 101.981), (87.376, 102.235), (91.313, 102.235), (91.567, 102.489), (91.567, 107.95), (91.186, 108.331), (88.592596753, 108.331), (87.840706234, 109.082890519), (85.376287582, 109.082890519), (85.217, 108.923602937), (85.217, 108.077), (84.836, 107.696), (83.185, 107.696), (82.169, 106.68), align=None)
    extrude(amount=CUT_EXTRUDE_8_DEPTH, mode=Mode.SUBTRACT)


solid = part.part
